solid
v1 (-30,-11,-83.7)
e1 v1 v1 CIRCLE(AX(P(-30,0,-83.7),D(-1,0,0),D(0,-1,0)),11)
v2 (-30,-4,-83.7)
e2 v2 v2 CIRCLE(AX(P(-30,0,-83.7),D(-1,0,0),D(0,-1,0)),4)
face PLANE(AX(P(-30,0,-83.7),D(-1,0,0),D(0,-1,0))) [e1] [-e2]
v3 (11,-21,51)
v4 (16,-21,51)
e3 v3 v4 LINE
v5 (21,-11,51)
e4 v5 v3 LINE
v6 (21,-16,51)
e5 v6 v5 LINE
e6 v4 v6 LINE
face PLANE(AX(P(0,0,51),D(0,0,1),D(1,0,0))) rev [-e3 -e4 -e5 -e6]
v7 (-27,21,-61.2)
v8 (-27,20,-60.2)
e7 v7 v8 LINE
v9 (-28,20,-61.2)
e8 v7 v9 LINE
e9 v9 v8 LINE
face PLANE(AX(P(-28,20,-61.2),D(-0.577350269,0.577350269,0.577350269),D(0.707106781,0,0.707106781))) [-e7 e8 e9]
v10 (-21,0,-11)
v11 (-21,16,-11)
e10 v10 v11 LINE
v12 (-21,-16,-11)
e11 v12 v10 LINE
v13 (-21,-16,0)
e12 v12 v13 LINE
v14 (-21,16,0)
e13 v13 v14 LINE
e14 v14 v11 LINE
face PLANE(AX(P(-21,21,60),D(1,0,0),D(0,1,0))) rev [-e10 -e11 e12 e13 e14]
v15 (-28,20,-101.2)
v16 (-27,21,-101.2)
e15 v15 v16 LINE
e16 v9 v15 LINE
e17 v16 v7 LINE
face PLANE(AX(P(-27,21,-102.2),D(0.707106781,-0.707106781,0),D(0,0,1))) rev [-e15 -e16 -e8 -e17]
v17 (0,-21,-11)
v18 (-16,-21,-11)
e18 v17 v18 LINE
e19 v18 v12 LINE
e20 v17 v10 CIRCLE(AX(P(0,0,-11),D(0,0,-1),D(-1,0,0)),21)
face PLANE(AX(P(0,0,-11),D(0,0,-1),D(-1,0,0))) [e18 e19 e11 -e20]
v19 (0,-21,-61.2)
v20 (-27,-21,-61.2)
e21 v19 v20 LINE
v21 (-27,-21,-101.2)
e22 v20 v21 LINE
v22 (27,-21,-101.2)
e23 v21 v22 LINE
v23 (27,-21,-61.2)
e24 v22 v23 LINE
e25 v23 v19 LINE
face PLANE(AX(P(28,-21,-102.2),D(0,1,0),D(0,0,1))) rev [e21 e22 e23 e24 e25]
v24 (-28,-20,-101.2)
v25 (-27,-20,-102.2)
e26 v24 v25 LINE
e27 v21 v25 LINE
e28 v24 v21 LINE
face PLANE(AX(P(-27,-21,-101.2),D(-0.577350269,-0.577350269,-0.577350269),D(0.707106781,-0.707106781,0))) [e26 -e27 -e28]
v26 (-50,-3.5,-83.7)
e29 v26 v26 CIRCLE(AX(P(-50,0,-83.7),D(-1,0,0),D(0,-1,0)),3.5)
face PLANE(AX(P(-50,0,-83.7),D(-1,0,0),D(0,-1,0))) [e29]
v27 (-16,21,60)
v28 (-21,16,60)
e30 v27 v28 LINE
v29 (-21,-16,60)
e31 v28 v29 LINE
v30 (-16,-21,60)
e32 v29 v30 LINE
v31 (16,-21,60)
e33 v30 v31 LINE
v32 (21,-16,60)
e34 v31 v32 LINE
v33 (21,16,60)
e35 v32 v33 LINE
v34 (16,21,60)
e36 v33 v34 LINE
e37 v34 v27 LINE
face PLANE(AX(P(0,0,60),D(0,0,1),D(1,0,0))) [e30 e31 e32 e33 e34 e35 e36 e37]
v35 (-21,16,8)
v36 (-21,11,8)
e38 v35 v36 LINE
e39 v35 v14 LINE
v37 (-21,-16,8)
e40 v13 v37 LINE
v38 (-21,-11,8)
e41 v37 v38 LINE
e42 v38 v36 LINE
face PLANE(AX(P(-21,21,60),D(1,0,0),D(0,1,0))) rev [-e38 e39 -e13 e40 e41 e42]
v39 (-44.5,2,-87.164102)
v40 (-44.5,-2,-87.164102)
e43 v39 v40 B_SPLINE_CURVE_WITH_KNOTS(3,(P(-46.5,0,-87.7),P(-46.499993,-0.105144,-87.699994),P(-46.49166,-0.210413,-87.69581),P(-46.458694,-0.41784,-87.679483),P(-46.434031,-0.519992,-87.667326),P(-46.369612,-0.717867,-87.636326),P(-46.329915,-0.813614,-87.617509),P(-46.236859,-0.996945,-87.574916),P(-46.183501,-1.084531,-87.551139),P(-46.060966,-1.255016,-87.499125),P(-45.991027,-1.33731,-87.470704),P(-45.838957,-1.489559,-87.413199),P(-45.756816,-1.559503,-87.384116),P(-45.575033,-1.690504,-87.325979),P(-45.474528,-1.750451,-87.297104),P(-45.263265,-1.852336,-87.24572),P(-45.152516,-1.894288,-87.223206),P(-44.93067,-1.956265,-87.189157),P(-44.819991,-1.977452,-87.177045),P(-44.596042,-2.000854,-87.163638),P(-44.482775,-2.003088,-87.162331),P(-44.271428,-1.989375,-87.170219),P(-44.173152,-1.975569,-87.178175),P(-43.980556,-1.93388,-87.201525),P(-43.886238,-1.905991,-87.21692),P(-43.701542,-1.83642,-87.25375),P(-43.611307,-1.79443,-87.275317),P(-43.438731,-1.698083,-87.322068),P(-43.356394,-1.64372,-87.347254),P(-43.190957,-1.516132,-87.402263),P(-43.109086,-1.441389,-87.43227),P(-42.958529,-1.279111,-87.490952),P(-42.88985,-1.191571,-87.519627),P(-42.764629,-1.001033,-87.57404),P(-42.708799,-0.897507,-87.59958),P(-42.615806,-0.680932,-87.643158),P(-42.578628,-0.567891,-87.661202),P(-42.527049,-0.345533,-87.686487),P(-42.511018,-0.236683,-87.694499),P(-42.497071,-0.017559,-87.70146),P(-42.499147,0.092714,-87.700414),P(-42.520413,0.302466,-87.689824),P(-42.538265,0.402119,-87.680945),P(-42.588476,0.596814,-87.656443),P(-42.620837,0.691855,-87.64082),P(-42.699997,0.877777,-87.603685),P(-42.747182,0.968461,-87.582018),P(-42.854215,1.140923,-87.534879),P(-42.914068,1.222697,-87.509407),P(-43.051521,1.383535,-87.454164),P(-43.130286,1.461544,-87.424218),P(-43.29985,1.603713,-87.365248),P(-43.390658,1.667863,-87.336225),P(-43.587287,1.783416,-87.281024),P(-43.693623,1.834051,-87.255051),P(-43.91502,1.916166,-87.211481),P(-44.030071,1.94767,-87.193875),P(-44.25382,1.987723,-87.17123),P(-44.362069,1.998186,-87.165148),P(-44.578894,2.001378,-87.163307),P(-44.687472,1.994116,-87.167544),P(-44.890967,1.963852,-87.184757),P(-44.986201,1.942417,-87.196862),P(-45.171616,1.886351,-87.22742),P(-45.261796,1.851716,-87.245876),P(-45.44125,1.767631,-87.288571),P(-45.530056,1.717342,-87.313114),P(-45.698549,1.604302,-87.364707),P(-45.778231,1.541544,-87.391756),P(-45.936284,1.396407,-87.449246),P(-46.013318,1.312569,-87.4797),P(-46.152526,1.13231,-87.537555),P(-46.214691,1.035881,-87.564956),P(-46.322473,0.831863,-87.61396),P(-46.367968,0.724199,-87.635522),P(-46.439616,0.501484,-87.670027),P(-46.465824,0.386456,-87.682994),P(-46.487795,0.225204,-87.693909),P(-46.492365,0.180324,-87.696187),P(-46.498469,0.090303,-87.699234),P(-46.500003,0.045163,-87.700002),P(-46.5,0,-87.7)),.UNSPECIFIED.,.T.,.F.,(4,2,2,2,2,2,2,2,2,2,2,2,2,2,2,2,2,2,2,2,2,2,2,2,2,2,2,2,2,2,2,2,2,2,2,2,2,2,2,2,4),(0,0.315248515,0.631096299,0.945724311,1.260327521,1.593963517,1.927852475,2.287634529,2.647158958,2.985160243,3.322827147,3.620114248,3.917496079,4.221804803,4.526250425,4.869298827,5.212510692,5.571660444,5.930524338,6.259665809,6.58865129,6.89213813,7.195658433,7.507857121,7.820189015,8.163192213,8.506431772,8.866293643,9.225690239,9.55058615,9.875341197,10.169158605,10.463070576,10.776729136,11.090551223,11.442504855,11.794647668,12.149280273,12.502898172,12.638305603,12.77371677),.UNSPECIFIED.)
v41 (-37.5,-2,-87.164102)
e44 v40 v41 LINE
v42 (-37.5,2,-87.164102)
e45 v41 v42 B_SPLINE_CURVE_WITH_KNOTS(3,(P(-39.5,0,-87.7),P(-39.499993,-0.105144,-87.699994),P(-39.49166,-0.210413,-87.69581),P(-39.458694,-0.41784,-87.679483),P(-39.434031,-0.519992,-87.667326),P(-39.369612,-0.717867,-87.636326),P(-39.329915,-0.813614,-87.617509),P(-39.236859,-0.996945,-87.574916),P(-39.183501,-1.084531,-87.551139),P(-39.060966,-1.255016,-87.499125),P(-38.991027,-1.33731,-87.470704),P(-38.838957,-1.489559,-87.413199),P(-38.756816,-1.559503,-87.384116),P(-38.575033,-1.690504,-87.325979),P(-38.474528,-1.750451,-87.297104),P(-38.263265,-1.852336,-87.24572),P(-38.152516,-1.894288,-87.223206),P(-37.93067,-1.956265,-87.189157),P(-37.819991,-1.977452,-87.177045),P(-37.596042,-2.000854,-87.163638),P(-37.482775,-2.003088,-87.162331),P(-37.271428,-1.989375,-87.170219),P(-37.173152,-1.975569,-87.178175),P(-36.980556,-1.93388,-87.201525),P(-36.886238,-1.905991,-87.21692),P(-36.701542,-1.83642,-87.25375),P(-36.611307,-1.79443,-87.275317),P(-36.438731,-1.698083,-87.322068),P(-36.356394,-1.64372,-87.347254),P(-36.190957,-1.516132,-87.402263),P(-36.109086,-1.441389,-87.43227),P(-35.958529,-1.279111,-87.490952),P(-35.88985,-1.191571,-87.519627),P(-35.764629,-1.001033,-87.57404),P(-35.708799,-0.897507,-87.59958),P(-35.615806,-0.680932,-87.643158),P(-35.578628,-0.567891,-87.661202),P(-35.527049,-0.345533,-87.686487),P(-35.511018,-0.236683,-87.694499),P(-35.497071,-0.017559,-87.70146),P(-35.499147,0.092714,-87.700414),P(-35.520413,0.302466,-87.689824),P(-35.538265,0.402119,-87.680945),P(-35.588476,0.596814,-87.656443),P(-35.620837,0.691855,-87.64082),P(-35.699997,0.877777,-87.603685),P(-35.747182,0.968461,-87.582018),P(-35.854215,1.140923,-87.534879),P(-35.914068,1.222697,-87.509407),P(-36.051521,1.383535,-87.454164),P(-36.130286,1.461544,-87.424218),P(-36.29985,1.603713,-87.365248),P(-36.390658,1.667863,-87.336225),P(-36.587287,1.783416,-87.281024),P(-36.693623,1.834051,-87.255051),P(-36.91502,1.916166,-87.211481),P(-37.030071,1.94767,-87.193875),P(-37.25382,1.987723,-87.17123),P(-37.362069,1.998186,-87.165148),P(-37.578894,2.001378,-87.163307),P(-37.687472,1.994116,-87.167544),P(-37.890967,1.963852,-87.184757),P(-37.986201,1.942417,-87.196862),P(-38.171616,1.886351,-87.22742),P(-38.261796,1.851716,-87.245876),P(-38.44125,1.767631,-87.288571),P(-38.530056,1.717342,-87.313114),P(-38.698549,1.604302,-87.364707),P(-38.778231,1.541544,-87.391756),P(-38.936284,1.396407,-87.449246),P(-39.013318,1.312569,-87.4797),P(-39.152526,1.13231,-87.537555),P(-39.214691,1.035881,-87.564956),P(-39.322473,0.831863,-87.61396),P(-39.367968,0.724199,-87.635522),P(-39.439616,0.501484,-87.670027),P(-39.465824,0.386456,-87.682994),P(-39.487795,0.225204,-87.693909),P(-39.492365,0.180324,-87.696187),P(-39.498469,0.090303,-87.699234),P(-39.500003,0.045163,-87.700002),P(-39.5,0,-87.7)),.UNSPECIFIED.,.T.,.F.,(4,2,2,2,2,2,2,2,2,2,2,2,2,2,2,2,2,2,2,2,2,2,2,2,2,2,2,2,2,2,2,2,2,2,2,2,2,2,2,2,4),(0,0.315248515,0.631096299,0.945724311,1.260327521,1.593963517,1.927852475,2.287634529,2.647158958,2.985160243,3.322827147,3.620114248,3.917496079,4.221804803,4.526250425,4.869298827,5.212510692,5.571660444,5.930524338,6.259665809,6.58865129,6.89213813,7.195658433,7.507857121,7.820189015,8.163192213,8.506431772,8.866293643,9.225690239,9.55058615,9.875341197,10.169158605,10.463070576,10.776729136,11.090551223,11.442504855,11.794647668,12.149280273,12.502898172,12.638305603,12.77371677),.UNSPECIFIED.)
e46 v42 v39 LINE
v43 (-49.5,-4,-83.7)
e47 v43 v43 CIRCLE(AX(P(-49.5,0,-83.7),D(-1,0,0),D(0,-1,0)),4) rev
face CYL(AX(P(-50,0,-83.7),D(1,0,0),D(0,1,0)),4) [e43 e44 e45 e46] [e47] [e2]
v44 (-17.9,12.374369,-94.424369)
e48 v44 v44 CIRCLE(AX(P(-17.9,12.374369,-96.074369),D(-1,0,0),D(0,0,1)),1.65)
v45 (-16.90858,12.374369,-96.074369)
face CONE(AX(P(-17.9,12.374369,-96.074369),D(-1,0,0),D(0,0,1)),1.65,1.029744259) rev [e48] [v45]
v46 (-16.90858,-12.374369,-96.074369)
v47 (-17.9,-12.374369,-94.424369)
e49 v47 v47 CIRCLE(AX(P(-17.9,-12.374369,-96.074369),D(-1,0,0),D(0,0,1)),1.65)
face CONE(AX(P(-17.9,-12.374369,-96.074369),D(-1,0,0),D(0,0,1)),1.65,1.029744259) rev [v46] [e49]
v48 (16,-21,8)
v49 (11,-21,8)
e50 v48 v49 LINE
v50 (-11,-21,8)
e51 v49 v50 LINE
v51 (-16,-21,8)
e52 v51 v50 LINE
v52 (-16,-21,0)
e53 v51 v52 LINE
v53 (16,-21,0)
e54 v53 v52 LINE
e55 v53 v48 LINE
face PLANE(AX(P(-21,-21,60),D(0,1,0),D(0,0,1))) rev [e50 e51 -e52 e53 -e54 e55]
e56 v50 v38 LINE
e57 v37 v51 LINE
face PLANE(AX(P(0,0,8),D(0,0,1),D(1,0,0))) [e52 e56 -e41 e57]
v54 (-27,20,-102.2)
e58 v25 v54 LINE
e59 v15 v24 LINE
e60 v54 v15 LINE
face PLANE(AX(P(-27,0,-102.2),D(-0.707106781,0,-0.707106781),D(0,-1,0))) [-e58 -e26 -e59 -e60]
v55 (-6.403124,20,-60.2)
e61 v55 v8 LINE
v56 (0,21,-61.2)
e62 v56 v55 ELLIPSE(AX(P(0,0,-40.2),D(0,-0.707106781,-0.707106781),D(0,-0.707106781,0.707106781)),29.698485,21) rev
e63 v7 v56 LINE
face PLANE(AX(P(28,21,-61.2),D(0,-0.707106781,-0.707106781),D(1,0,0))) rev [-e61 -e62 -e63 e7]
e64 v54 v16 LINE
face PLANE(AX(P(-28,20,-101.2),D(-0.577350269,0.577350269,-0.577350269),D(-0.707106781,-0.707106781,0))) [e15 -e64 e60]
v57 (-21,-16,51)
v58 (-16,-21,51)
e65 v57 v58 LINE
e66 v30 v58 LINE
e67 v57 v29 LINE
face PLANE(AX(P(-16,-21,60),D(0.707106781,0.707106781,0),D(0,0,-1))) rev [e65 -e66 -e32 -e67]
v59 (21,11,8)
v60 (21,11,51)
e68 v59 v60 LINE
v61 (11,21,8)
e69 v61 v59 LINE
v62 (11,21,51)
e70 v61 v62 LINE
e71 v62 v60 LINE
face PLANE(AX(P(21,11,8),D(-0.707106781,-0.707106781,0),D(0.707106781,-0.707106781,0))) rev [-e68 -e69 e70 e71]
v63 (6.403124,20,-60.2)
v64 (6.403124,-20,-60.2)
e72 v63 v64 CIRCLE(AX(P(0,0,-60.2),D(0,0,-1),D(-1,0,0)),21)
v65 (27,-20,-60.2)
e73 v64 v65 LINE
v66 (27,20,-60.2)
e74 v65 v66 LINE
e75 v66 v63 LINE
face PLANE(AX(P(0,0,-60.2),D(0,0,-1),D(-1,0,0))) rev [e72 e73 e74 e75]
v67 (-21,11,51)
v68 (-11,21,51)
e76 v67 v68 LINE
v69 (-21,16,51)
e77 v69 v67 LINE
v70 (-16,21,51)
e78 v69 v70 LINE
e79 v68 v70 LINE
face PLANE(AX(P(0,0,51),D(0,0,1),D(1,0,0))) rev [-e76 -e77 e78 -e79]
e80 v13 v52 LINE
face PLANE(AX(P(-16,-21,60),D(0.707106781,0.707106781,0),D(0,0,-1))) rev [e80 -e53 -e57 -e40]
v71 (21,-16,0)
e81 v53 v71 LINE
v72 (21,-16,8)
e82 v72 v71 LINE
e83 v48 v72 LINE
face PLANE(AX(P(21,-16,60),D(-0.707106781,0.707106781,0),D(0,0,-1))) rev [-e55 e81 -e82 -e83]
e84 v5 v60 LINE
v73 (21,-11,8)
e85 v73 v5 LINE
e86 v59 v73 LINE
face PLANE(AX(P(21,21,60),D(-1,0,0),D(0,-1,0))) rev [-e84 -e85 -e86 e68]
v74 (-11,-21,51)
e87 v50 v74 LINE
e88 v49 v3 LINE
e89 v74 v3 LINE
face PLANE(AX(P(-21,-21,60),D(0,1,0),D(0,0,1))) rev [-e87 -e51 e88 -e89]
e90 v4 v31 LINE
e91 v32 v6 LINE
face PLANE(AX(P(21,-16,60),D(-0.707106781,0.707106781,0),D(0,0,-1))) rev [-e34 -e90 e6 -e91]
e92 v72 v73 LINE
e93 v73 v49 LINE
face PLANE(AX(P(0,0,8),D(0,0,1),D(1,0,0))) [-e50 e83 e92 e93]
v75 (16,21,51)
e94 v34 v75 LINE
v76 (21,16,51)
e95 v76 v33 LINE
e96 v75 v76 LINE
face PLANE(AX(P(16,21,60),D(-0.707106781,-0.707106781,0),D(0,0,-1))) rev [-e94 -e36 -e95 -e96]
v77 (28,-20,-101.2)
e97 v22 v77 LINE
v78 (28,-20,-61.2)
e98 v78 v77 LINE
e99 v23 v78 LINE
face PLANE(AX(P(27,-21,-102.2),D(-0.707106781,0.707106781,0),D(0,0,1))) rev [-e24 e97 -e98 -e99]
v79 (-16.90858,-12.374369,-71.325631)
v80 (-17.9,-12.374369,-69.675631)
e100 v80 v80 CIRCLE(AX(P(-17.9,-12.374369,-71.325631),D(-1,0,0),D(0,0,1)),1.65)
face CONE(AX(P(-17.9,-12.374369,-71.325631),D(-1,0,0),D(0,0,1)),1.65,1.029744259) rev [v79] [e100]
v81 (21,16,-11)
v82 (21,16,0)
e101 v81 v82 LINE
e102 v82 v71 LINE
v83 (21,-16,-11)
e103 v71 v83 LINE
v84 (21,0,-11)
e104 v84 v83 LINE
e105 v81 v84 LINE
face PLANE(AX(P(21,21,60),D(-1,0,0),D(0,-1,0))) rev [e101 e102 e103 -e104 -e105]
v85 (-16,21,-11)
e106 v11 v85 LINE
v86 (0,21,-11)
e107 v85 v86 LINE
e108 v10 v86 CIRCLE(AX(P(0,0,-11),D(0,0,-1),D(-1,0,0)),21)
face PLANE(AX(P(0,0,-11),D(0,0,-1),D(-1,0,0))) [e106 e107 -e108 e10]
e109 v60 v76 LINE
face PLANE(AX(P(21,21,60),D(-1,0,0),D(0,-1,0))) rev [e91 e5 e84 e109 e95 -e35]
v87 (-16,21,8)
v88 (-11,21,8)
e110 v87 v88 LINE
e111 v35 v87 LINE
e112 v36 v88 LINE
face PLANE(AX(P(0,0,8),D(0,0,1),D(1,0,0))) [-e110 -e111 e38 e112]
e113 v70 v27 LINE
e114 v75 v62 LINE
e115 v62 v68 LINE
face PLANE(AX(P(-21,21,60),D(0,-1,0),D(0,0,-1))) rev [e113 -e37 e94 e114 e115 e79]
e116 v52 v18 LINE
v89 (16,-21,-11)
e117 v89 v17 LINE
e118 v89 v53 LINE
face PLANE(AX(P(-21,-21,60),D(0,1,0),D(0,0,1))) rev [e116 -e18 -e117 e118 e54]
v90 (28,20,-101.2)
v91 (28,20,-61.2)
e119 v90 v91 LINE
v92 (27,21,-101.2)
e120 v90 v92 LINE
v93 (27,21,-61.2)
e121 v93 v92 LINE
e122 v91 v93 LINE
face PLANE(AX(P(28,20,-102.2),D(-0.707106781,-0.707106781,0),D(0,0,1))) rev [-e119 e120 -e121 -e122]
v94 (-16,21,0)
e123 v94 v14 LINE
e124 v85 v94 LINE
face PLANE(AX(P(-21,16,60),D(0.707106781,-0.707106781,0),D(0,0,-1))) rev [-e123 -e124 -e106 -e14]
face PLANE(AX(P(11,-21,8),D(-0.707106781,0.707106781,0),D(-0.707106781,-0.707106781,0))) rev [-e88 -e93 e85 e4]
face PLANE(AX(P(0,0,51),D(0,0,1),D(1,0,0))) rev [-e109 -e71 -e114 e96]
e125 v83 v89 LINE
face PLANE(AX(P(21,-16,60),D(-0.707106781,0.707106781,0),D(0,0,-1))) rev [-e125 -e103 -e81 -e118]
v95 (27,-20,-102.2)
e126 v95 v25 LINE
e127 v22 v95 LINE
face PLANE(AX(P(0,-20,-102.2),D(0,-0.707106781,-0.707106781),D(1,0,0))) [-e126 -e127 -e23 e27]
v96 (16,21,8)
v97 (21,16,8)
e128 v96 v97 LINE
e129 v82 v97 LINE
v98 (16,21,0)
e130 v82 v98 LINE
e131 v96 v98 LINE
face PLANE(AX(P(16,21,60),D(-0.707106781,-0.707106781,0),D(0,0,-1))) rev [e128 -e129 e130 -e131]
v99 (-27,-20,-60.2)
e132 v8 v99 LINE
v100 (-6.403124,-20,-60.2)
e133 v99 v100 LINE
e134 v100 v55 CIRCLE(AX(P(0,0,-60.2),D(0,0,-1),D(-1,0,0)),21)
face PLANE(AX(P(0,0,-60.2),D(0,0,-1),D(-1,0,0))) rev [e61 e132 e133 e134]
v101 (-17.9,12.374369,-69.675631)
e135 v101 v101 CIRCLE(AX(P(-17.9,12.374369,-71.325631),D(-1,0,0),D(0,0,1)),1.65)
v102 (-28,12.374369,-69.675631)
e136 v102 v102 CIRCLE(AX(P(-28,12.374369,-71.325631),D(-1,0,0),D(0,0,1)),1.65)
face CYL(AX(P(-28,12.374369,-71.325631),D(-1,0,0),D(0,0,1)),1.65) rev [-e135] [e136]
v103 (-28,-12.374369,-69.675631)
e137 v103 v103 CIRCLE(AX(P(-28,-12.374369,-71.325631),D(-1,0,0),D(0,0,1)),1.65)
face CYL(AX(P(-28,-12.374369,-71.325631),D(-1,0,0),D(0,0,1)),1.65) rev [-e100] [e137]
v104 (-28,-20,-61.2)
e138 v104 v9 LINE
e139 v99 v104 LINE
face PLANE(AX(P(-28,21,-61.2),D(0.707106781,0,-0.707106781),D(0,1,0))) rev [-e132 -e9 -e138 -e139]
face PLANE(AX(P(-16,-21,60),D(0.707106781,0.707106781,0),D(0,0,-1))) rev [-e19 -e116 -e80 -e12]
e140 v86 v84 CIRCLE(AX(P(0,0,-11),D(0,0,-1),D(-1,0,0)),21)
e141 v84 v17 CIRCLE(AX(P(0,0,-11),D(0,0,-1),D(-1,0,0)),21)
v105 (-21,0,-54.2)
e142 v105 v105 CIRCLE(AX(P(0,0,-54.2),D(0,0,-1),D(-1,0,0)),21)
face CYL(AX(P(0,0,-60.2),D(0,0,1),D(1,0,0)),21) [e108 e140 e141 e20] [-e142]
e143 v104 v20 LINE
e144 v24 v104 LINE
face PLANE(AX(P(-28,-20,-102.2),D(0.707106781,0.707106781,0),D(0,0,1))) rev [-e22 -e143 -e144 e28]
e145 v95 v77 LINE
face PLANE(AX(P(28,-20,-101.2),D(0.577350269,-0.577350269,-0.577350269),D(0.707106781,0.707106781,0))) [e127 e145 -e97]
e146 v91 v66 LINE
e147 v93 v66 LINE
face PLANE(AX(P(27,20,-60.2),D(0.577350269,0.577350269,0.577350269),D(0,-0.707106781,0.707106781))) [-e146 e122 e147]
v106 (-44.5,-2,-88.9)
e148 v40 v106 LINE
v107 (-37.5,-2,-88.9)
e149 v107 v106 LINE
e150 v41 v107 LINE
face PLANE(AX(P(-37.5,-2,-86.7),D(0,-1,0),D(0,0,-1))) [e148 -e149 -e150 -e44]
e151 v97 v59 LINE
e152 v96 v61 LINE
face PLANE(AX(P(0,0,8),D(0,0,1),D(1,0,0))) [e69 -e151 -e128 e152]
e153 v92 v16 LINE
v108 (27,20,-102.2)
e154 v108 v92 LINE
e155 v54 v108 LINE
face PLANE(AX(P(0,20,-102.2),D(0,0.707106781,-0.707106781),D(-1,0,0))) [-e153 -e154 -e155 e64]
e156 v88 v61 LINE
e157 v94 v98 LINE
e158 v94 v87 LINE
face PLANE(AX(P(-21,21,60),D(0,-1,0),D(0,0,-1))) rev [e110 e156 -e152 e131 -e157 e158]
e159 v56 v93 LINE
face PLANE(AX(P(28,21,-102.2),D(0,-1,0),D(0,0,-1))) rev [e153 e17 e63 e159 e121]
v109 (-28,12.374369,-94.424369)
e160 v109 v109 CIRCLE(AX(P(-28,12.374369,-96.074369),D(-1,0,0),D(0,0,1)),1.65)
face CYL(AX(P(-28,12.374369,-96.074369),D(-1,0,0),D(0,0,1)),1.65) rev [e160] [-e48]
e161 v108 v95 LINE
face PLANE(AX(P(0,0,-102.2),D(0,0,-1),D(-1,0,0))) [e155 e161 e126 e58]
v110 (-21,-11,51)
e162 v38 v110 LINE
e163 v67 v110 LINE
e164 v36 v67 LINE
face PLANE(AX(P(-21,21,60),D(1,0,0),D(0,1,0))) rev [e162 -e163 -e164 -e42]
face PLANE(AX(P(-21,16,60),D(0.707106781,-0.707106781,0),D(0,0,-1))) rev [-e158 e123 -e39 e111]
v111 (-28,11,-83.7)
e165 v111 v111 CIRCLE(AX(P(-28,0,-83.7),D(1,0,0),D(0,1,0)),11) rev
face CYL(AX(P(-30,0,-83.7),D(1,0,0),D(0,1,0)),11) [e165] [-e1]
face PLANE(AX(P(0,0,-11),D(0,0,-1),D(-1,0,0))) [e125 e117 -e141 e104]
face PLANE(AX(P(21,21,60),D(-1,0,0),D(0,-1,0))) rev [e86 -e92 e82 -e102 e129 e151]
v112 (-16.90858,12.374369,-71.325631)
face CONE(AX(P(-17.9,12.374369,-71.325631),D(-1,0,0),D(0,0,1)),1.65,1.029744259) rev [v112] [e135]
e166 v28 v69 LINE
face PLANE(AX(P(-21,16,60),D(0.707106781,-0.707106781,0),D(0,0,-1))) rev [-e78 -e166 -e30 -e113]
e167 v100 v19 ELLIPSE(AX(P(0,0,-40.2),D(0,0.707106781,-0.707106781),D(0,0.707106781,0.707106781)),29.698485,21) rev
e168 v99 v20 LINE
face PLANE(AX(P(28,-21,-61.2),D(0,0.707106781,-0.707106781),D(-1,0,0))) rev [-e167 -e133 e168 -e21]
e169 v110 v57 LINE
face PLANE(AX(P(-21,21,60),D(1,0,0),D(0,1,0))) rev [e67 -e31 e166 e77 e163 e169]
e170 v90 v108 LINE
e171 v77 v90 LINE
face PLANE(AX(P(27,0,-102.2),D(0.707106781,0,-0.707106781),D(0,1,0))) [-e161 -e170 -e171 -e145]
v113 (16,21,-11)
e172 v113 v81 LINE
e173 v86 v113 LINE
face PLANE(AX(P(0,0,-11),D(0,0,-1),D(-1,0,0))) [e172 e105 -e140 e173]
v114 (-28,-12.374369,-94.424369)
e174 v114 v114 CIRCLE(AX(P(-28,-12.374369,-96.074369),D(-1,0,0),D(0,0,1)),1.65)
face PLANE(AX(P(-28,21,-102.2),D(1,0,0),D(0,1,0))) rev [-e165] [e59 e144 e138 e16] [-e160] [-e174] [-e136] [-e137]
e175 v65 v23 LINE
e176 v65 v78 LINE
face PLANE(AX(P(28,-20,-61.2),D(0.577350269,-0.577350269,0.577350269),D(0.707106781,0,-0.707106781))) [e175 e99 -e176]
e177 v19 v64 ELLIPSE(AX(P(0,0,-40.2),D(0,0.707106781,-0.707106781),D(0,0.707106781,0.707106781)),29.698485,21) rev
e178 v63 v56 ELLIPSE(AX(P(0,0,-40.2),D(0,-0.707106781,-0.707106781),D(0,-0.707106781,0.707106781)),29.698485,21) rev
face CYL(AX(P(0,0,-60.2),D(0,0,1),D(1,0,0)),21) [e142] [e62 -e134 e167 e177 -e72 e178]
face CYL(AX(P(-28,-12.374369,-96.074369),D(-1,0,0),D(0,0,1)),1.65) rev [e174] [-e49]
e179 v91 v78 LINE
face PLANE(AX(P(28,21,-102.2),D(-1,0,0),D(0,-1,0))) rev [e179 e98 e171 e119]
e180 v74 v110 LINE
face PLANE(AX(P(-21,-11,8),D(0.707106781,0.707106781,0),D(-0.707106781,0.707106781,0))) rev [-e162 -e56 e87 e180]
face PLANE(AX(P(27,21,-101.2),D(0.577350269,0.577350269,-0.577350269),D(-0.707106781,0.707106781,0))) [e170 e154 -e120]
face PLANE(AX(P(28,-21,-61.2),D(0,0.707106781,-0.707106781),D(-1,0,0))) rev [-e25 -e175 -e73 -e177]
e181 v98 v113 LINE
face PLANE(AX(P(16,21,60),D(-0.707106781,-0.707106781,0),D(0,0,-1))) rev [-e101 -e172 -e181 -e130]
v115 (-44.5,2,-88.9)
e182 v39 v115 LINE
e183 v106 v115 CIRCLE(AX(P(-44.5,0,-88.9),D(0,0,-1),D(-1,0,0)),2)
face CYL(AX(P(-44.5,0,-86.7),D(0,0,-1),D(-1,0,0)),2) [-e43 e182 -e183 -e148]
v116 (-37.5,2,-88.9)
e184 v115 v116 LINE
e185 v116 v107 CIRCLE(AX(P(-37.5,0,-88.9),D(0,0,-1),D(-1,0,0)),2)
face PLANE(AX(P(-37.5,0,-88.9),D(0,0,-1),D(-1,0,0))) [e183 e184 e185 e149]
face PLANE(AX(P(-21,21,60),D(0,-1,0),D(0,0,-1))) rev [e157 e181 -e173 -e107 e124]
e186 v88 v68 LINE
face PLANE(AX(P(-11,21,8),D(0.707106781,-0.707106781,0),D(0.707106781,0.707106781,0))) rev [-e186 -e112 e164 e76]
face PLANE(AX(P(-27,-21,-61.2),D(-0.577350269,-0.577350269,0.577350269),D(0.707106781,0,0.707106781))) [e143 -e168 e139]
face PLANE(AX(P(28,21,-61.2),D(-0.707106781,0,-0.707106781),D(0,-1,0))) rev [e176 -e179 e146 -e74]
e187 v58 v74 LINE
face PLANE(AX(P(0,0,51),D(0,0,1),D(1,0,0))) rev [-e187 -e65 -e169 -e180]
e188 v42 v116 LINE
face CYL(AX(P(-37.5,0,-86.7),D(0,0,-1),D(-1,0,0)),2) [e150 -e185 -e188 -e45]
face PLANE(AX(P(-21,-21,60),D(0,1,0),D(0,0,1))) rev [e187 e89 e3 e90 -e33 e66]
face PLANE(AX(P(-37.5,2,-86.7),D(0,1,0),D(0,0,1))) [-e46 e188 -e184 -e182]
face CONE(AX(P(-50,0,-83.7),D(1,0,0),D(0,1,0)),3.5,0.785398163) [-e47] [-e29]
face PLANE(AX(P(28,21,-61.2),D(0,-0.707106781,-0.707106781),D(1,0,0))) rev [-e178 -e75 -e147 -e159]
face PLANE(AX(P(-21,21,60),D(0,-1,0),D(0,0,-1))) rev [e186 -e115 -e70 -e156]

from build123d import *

# Parameters (mm, degrees)
SKETCH_1_W             = 42
SKETCH_1_H             = 42
EXTRUDE_1_DEPTH        = 60
CHAMFER_1_SIZE         = 5
CUT_EXTRUDE_1_DEPTH    = 43
EXTRUDE_2_DEPTH        = 11
SKETCH_4_R             = 21
EXTRUDE_3_DEPTH        = 49.2
SKETCH_5_W             = 56
SKETCH_5_H             = 42
EXTRUDE_4_DEPTH        = 42
CHAMFER_2_SIZE         = 1
HOLE_WIZARD_M4_1_D     = 3.3
HOLE_WIZARD_M4_1_DEPTH = 10.1
HOLE_WIZARD_M4_1_TIP   = 0.991420021
SKETCH_10_R            = 11
EXTRUDE_5_DEPTH        = 2
SKETCH_11_R            = 4
EXTRUDE_6_DEPTH        = 20
CHAMFER_3_SIZE         = 0.5
EXTRUDE_7_DEPTH        = 1.2
EXTRUDE_7_DEPTH_BACK   = 1


with BuildPart() as part:
    # 스케치1 → 보스-돌출1 (new body)
    with BuildSketch(Plane.XY):
        Rectangle(SKETCH_1_W, SKETCH_1_H)
    extrude(amount=EXTRUDE_1_DEPTH)

    # 모따기1
    chamfer_1_edges = [part.edges().sort_by_distance(p)[0] for p in [
        (21, 21, 30),
        (21, -21, 30),
        (-21, 21, 30),
        (-21, -21, 30),
        (-21, 21, 30),
        (-21, -21, 30),
        (21, 21, 30),
        (21, -21, 30),
        (21, -21, 30),
        (-21, -21, 30),
        (-21, 21, 30),
        (21, 21, 30),
    ]]
    chamfer(chamfer_1_edges, length=CHAMFER_1_SIZE)

    # 스케치2 → 컷-돌출1 (cut)
    with BuildSketch(Plane.XY.offset(51)):
        Polygon((-11, 21), (-21, 21), (-21, 11), align=None)
        Polygon((21, 11), (21, 21), (11, 21), align=None)
        Polygon((11, -21), (21, -21), (21, -11), align=None)
        Polygon((-21, -11), (-21, -21), (-11, -21), align=None)
    extrude(amount=-CUT_EXTRUDE_1_DEPTH, mode=Mode.SUBTRACT)

    # 스케치3 → 보스-돌출2 (add)
    with BuildSketch(Plane(origin=(0, 0, 0), x_dir=(-1, 0, 0), z_dir=(0, 0, -1))):
        Polygon((-16, 21), (-21, 16), (-21, -16), (-16, -21), (16, -21), (21, -16), (21, 16), (16, 21), align=None)
    extrude(amount=EXTRUDE_2_DEPTH)

    # 스케치4 → 보스-돌출3 (add)
    with BuildSketch(Plane(origin=(0, 0, -11), x_dir=(-1, 0, 0), z_dir=(0, 0, -1))):
        Circle(SKETCH_4_R)
    extrude(amount=EXTRUDE_3_DEPTH)

    # 스케치5 → 보스-돌출4 (add)
    with BuildSketch(Plane(origin=(0, 0, -60.2), x_dir=(-1, 0, 0), z_dir=(0, 0, -1))):
        Rectangle(SKETCH_5_W, SKETCH_5_H)
    extrude(amount=EXTRUDE_4_DEPTH)

    # 모따기2
    # the kernel refuses this chamfer: 1 mm, written as the material it takes off along each edge
    with BuildSketch(Plane(origin=(-27.333333333, 20.333333333, -60.866666667), x_dir=(0.7071067811865475, 0.7071067811865475, 0), z_dir=(-0.5773502691896258, 0.5773502691896258, 0.5773502691896258)), Plane(origin=(-27.333333333, -20.333333333, -60.866666667), x_dir=(-0.7071067811865475, 0.7071067811865475, 0), z_dir=(-0.5773502691896258, -0.5773502691896258, 0.5773502691896258)), Plane(origin=(27.333333333, 20.333333333, -60.866666667), x_dir=(0.7071067811865475, -0.7071067811865475, 0), z_dir=(0.5773502691896258, 0.5773502691896258, 0.5773502691896258)), Plane(origin=(27.333333333, -20.333333333, -101.533333333), x_dir=(0.7071067811865475, 0.7071067811865475, 0), z_dir=(0.5773502691896258, -0.5773502691896258, -0.5773502691896258))) as chamfer_2_piece_1:
        Polygon((-0.707106781, 0.40824829), (0.707106781, 0.40824829), (0, -0.816496581), align=None)
    extrude(amount=1.270170592, mode=Mode.SUBTRACT)
    with BuildSketch(Plane(origin=(-27.333333333, -20.333333333, -101.533333333), x_dir=(-0.7071067811865475, 0.7071067811865475, 0), z_dir=(-0.5773502691896258, -0.5773502691896258, -0.5773502691896258)), Plane(origin=(-27.333333333, 20.333333333, -101.533333333), x_dir=(0.7071067811865475, 0.7071067811865475, 0), z_dir=(-0.5773502691896258, 0.5773502691896258, -0.5773502691896258)), Plane(origin=(27.333333333, -20.333333333, -60.866666667), x_dir=(0.7071067811865475, 0.7071067811865475, 0), z_dir=(0.5773502691896258, -0.5773502691896258, 0.5773502691896258)), Plane(origin=(27.333333333, 20.333333333, -101.533333333), x_dir=(0.7071067811865475, -0.7071067811865475, 0), z_dir=(0.5773502691896258, 0.5773502691896258, -0.5773502691896258))) as chamfer_2_piece_2:
        Polygon((-0.707106781, -0.40824829), (0.707106781, -0.40824829), (0, 0.816496581), align=None)
    extrude(amount=1.270170592, mode=Mode.SUBTRACT)
    with BuildSketch(Plane(origin=(-28, 23.571682988, -60.2), x_dir=(0.9996219169112968, 0, 0.0274958766105891), z_dir=(0, -1, 0)), Plane(origin=(-28, -21, -57.628317012), x_dir=(0.9996219169112968, -0.027495876610585647, 0), z_dir=(0, 0, -1)), Plane(origin=(-28, 21, -57.628317012), x_dir=(-0.027495876610585647, -0.9996219169112968, 0), z_dir=(0, 0, -1)), Plane(origin=(28, -23.571682988, -60.2), x_dir=(-0.9996219169112968, 0, 0.0274958766105891), z_dir=(0, 1, 0)), Plane(origin=(28, 21, -57.628317012), x_dir=(-0.9996219169112968, 0.027495876610585647, 0), z_dir=(0, 0, -1)), Plane(origin=(-28, 23.571682988, -102.2), x_dir=(-0.02749587661058574, 0, 0.9996219169112968), z_dir=(0, -1, 0)), Plane(origin=(28, -23.571682988, -102.2), x_dir=(0.02749587661058574, 0, 0.9996219169112968), z_dir=(0, 1, 0))) as chamfer_2_piece_3:
        Polygon((CHAMFER_2_SIZE * 0.999621916911, -CHAMFER_2_SIZE * 0.0274958766106), (-CHAMFER_2_SIZE * 0.0274958766106, -CHAMFER_2_SIZE * 0.999621916911), (0, 0), align=None)
    extrude(amount=47.143365976, mode=Mode.SUBTRACT)
    with BuildSketch(Plane(origin=(0, 21, -60.2), x_dir=(0, -0.9996219169112968, 0.0274958766105891), z_dir=(-1, 0, 0))) as chamfer_2_piece_4_section:
        Polygon((CHAMFER_2_SIZE * 0.999621916911, -CHAMFER_2_SIZE * 0.0274958766106), (-CHAMFER_2_SIZE * 0.0274958766106, -CHAMFER_2_SIZE * 0.999621916911), (0, 0), align=None)
    chamfer_2_piece_4 = extrude(amount=30.571682988, mode=Mode.PRIVATE)
    chamfer_2_piece_4 = chamfer_2_piece_4 - Plane(origin=(0, 0, -60.539954397), x_dir=(-1, 0, 0), z_dir=(0, 0, 1)) * Cylinder(21, 66, mode=Mode.PRIVATE)
    add(chamfer_2_piece_4, mode=Mode.SUBTRACT)
    with BuildSketch(Plane(origin=(30.571682988, 21, -60.2), x_dir=(0, -0.9996219169112968, 0.0274958766105891), z_dir=(-1, 0, 0))) as chamfer_2_piece_5_section:
        Polygon((CHAMFER_2_SIZE * 0.999621916911, -CHAMFER_2_SIZE * 0.0274958766106), (-CHAMFER_2_SIZE * 0.0274958766106, -CHAMFER_2_SIZE * 0.999621916911), (0, 0), align=None)
    chamfer_2_piece_5 = extrude(amount=30.571682988, mode=Mode.PRIVATE)
    chamfer_2_piece_5 = chamfer_2_piece_5 - Plane(origin=(0, 0, -60.539954397), x_dir=(-1, 0, 0), z_dir=(0, 0, 1)) * Cylinder(21, 66, mode=Mode.PRIVATE)
    add(chamfer_2_piece_5, mode=Mode.SUBTRACT)
    with BuildSketch(Plane(origin=(4.1e-08, -21, -60.2), x_dir=(0, 0.9996219169112968, 0.0274958766105891), z_dir=(1, 0, 0))) as chamfer_2_piece_6_section:
        Polygon((CHAMFER_2_SIZE * 0.999621916911, -CHAMFER_2_SIZE * 0.0274958766106), (-CHAMFER_2_SIZE * 0.0274958766106, -CHAMFER_2_SIZE * 0.999621916911), (0, 0), align=None)
    chamfer_2_piece_6 = extrude(amount=30.571682947, mode=Mode.PRIVATE)
    chamfer_2_piece_6 = chamfer_2_piece_6 - Plane(origin=(0, 0, -60.539954397), x_dir=(-1, 0, 0), z_dir=(0, 0, 1)) * Cylinder(21, 66, mode=Mode.PRIVATE)
    add(chamfer_2_piece_6, mode=Mode.SUBTRACT)
    with BuildSketch(Plane(origin=(-30.571682988, -21, -60.2), x_dir=(0, 0.9996219169112968, 0.0274958766105891), z_dir=(1, 0, 0))) as chamfer_2_piece_7_section:
        Polygon((CHAMFER_2_SIZE * 0.999621916911, -CHAMFER_2_SIZE * 0.0274958766106), (-CHAMFER_2_SIZE * 0.0274958766106, -CHAMFER_2_SIZE * 0.999621916911), (0, 0), align=None)
    chamfer_2_piece_7 = extrude(amount=30.571683029, mode=Mode.PRIVATE)
    chamfer_2_piece_7 = chamfer_2_piece_7 - Plane(origin=(0, 0, -60.539954397), x_dir=(-1, 0, 0), z_dir=(0, 0, 1)) * Cylinder(21, 66, mode=Mode.PRIVATE)
    add(chamfer_2_piece_7, mode=Mode.SUBTRACT)
    with BuildSketch(Plane(origin=(28, -21, -57.628317012), x_dir=(-0.9996219169112968, -0.027495876610585647, 0), z_dir=(0, 0, -1))) as chamfer_2_piece_8:
        Polygon((CHAMFER_2_SIZE * 0.999621916911, CHAMFER_2_SIZE * 0.0274958766106), (-CHAMFER_2_SIZE * 0.0274958766106, CHAMFER_2_SIZE * 0.999621916911), (0, 0), align=None)
    extrude(amount=47.143365976, mode=Mode.SUBTRACT)
    with BuildSketch(Plane(origin=(30.571682988, 21, -102.2), x_dir=(0, 0.02749587661058574, 0.9996219169112968), z_dir=(-1, 0, 0)), Plane(origin=(-30.571682988, -21, -102.2), x_dir=(0, -0.02749587661058574, 0.9996219169112968), z_dir=(1, 0, 0))) as chamfer_2_piece_9:
        Polygon((CHAMFER_2_SIZE * 0.999621916911, -CHAMFER_2_SIZE * 0.0274958766106), (-CHAMFER_2_SIZE * 0.0274958766106, -CHAMFER_2_SIZE * 0.999621916911), (0, 0), align=None)
    extrude(amount=61.143365976, mode=Mode.SUBTRACT)

    # M4 나사 구멍1
    with Locations(Plane.ZY.offset(28)):
        with Locations((-96.074368671, 12.374368671), (-71.325631329, 12.374368671), (-71.325631329, -12.374368671), (-96.074368671, -12.374368671)):
            Hole(HOLE_WIZARD_M4_1_D / 2, depth=HOLE_WIZARD_M4_1_DEPTH)
            with Locations((0, 0, -(HOLE_WIZARD_M4_1_DEPTH + HOLE_WIZARD_M4_1_TIP / 2))):  # 118° drill point
                Cone(0, HOLE_WIZARD_M4_1_D / 2, HOLE_WIZARD_M4_1_TIP, mode=Mode.SUBTRACT)

    # 스케치10 → 보스-돌출5 (add)
    with BuildSketch(Plane.ZY.offset(28)):
        with Locations(Location((-83.7, 0, 0), (0, 0, 90))):
            Circle(SKETCH_10_R)
    extrude(amount=EXTRUDE_5_DEPTH)

    # 스케치11 → 보스-돌출6 (add)
    with BuildSketch(Plane.ZY.offset(30)):
        with Locations(Location((-83.7, 0, 0), (0, 0, 270))):
            Circle(SKETCH_11_R)
    extrude(amount=EXTRUDE_6_DEPTH)

    # 모따기3
    chamfer_3_edges = [part.edges().sort_by_distance(p)[0] for p in [
        (-50, 4, -83.7),
    ]]
    chamfer(chamfer_3_edges, length=CHAMFER_3_SIZE)

    # 스케치12 → 보스-돌출7 (add, two sides: drawn at the far end of the back side and taken through both)
    with BuildSketch(Plane(origin=(0, 0, -87.7), x_dir=(-1, 0, 0), z_dir=(0, 0, -1)).offset(-EXTRUDE_7_DEPTH_BACK)):
        with BuildLine():
            Line((37.5, 2), (44.5, 2))
            ThreePointArc((44.5, 2), (46.5, 0), (44.5, -2))
            Line((44.5, -2), (37.5, -2))
            ThreePointArc((37.5, -2), (35.5, 0), (37.5, 2))
        make_face()
    extrude(amount=EXTRUDE_7_DEPTH + EXTRUDE_7_DEPTH_BACK)


solid = part.part
